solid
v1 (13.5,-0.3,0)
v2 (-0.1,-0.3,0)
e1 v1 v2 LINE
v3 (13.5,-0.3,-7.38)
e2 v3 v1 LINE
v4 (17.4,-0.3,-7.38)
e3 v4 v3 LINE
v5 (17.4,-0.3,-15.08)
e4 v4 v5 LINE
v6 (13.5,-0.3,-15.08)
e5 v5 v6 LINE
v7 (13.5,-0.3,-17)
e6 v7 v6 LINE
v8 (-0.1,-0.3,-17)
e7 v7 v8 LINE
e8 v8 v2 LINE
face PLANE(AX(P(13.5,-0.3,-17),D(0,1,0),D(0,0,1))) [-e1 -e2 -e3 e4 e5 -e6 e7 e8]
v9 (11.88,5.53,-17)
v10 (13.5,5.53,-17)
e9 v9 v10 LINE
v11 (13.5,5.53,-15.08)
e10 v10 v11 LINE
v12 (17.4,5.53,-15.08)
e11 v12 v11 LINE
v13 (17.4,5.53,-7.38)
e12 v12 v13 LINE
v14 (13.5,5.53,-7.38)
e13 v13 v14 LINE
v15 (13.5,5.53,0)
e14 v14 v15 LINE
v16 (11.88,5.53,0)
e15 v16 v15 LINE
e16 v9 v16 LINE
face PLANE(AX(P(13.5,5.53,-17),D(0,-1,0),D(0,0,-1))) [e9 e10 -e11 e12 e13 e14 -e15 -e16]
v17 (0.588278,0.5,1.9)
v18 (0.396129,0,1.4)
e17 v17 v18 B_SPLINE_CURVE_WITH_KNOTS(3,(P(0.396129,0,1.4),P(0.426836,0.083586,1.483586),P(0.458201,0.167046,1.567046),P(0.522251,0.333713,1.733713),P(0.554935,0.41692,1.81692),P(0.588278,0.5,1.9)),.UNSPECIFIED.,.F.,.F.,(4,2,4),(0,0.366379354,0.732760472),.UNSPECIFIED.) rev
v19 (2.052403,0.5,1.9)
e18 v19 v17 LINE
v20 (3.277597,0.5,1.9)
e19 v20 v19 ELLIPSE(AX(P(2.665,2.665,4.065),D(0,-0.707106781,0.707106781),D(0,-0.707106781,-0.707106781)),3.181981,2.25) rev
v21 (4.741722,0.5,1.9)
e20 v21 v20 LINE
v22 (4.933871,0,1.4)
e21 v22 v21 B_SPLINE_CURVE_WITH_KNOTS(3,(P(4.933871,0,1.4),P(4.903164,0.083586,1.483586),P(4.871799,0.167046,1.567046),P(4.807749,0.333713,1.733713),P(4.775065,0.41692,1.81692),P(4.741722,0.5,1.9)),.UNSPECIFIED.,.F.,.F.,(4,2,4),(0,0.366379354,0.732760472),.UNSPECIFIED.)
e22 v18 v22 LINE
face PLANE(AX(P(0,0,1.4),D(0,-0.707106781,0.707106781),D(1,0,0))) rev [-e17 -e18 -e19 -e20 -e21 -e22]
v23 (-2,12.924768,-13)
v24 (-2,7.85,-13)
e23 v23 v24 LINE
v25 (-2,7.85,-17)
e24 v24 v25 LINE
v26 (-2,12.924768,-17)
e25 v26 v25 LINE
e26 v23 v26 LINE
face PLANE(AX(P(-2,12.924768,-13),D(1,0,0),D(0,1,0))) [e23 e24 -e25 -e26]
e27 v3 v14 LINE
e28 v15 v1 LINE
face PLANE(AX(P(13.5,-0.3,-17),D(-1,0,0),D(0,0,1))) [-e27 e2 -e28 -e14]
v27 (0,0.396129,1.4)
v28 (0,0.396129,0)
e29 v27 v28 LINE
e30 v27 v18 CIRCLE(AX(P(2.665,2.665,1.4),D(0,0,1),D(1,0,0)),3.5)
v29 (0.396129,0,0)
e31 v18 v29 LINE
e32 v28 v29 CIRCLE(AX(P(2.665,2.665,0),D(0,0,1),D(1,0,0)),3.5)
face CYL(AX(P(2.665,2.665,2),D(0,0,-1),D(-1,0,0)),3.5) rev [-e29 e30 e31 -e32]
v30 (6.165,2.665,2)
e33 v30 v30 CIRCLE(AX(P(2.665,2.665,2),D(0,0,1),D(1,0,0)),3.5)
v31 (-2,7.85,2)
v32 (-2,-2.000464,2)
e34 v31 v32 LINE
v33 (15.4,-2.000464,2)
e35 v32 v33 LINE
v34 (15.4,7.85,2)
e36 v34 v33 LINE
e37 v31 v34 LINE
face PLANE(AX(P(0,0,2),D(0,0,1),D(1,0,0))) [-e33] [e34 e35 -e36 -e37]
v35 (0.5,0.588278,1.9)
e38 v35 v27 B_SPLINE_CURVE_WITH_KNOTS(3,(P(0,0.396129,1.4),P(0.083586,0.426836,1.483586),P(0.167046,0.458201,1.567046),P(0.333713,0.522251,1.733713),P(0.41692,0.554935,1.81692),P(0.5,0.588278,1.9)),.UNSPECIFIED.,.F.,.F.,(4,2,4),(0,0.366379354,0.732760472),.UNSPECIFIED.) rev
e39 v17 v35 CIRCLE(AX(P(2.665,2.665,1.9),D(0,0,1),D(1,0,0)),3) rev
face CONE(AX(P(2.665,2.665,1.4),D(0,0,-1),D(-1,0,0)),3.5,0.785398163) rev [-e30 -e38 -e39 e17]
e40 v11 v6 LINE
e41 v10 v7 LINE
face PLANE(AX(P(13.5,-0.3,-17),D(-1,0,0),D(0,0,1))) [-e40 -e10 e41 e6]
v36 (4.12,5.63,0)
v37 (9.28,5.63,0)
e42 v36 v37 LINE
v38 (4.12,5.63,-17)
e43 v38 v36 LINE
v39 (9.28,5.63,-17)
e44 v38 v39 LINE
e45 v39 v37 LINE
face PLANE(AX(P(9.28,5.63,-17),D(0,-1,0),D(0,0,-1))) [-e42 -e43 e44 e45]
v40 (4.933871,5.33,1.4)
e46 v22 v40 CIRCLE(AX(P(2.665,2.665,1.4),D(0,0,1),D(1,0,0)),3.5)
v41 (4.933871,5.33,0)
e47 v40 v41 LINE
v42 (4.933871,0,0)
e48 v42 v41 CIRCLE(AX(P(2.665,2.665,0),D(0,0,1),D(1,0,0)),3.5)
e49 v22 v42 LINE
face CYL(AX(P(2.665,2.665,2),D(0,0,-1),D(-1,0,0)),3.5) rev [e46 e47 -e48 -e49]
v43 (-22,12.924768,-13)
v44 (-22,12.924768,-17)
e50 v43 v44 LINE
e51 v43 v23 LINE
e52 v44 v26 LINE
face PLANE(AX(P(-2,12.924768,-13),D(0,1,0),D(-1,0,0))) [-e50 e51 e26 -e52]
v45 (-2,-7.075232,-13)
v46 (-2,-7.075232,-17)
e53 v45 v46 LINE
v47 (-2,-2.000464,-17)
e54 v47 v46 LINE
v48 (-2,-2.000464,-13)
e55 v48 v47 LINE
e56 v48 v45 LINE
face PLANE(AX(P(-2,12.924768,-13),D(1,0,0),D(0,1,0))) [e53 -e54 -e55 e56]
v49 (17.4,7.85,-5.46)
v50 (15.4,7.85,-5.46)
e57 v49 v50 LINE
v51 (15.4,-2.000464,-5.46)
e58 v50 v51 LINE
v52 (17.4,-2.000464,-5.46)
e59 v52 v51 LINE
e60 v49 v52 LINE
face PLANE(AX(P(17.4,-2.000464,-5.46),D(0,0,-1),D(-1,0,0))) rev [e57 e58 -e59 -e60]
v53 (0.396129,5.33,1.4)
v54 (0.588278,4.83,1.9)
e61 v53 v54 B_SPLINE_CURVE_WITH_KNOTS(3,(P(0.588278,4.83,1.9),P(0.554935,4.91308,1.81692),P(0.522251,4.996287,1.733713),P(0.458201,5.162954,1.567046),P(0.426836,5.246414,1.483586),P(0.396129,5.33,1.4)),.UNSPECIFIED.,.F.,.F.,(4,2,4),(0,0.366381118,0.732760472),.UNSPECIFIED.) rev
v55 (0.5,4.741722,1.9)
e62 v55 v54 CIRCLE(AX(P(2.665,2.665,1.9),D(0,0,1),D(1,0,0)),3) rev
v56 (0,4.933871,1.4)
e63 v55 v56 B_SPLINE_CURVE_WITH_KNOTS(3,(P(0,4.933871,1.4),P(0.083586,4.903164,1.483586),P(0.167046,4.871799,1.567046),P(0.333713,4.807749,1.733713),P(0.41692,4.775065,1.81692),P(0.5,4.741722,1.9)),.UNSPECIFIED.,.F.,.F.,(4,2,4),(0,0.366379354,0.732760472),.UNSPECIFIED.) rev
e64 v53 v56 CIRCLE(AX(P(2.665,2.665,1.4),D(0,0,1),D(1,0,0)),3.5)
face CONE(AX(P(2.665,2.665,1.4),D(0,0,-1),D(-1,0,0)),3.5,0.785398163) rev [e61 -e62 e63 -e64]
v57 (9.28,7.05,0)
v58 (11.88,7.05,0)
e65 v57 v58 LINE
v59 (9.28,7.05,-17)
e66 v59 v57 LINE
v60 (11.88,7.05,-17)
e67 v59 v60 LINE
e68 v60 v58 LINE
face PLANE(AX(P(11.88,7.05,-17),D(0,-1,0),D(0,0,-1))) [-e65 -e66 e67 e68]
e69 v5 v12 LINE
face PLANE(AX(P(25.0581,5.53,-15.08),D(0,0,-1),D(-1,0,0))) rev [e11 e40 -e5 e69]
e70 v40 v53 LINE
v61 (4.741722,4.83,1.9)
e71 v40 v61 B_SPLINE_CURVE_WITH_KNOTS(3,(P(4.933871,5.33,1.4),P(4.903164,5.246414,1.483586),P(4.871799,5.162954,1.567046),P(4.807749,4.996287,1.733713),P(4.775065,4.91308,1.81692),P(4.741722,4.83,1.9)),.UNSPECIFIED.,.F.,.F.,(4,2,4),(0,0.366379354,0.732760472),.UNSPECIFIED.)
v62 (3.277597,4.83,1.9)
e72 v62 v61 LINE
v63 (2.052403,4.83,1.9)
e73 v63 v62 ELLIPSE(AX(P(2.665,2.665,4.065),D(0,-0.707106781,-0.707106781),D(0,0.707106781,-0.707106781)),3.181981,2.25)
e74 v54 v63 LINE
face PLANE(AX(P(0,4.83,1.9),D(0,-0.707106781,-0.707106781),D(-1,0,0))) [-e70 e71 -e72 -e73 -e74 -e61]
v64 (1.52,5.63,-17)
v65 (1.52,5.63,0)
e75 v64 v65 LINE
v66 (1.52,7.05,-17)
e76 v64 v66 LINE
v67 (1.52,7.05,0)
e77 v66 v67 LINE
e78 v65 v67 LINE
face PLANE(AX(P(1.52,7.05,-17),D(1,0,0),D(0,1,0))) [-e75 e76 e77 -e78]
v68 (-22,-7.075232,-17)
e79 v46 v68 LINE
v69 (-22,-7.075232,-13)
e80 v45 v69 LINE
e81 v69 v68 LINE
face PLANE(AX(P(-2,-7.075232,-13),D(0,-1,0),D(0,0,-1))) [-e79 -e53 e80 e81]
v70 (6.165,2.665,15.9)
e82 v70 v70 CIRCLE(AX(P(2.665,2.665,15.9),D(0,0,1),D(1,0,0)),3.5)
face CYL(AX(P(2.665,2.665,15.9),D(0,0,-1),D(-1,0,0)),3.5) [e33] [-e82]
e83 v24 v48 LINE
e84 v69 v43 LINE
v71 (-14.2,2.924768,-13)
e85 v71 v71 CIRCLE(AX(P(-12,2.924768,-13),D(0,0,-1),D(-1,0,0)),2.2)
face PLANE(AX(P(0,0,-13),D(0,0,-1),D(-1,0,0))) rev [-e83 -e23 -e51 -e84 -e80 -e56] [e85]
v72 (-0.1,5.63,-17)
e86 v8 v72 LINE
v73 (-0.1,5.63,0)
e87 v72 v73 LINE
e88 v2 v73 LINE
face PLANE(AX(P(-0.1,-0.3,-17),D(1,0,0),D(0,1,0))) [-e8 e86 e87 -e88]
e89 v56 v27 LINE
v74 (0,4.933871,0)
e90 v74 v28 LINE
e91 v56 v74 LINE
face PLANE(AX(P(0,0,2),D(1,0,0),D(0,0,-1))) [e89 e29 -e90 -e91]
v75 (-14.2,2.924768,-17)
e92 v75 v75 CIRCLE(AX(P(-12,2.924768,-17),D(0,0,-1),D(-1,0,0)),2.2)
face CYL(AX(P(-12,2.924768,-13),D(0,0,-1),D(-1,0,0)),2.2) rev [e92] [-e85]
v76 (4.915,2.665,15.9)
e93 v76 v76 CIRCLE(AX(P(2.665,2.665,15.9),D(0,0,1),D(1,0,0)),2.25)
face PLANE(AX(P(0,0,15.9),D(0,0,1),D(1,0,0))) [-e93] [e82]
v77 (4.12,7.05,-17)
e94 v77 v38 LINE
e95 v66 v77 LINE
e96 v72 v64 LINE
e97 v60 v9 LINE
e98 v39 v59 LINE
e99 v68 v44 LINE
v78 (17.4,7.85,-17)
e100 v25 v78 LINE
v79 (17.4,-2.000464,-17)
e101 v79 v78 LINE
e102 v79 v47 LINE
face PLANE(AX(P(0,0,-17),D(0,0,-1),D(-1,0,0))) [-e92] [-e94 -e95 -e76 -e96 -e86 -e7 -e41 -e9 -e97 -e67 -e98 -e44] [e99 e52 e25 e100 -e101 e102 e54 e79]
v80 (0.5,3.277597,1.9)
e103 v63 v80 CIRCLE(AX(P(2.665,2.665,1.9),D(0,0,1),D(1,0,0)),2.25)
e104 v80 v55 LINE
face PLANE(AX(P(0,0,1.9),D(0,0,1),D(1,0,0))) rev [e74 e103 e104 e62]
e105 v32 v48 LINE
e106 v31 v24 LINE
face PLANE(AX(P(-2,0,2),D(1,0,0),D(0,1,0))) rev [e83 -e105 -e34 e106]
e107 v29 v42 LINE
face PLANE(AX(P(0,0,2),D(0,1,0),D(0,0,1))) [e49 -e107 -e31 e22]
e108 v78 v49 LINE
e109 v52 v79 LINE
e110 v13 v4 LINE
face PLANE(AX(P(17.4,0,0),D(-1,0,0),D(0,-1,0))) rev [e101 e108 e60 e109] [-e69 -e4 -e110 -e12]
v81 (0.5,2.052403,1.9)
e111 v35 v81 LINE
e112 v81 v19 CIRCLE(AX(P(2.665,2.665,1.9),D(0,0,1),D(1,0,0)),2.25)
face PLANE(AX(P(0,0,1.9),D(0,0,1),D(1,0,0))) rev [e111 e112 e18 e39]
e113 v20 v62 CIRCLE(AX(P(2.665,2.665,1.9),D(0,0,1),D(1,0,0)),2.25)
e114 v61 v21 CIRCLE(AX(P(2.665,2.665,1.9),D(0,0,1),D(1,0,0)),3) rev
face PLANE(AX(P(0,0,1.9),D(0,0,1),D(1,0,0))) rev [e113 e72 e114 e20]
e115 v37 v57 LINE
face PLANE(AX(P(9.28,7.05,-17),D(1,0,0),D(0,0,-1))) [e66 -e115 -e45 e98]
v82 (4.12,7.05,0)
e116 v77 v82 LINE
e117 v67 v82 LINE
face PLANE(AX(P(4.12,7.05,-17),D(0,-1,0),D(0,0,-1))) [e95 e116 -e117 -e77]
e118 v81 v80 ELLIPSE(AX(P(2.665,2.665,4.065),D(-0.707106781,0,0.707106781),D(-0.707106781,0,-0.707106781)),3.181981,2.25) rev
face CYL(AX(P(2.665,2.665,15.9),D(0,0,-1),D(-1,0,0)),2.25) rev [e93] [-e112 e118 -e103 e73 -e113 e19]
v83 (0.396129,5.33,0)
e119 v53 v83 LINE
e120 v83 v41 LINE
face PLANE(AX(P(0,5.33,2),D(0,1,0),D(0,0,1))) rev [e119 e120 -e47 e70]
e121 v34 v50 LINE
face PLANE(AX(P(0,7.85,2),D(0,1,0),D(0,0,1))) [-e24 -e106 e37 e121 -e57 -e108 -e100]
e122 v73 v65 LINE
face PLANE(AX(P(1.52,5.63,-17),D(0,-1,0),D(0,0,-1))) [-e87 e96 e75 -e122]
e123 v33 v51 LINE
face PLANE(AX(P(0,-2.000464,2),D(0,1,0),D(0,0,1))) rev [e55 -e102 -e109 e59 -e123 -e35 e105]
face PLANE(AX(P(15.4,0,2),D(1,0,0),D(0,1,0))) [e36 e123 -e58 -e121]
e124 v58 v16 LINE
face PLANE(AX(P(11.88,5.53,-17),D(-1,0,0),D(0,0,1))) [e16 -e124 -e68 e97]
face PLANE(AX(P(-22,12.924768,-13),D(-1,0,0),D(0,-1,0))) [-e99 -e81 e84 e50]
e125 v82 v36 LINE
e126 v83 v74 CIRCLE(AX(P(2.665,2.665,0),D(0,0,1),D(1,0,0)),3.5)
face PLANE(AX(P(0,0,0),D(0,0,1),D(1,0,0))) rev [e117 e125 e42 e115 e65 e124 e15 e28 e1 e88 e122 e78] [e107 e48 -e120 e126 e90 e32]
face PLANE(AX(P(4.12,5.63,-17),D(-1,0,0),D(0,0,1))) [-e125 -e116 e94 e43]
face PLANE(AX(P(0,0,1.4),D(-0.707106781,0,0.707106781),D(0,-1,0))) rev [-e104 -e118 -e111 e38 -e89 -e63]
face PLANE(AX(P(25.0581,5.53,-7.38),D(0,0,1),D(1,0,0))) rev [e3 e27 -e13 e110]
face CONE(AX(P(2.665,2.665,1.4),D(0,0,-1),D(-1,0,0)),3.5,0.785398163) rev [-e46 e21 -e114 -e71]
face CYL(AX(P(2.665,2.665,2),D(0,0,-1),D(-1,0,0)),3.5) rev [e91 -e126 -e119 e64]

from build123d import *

# Parameters (mm, degrees)
SKETCH1_W           = 17.4
SKETCH1_H           = 9.850463562
BOSS_EXTRUDE1_DEPTH = 2
BOSS_EXTRUDE2_START = 1.9
SKETCH1_4_R         = 2.25
BOSS_EXTRUDE2_DEPTH = 14
SKETCH2_W           = 17.4
SKETCH2_H           = 9.850463562
BOSS_EXTRUDE3_DEPTH = 17
SKETCH4_W           = 7.7
SKETCH4_H           = 5.83
CUT_EXTRUDE1_DEPTH  = 1.9
SKETCH5_W           = 20
SKETCH5_H           = 20
SKETCH5_R           = 2.2
BOSS_EXTRUDE4_DEPTH = 4
CHAMFER1_SIZE       = 0.5
SKETCH6_W           = 11.54
SKETCH6_H           = 9.850463562
SKETCH6_W_2         = 7.7
SKETCH6_H_2         = 5.83
BOSS_EXTRUDE5_DEPTH = 2


with BuildPart() as part:
    # Sketch1 → Boss-Extrude1 (new body)
    with BuildSketch(Plane.XY):
        with Locations((6.7, 2.924768219)):
            Rectangle(SKETCH1_W, SKETCH1_H)
        with BuildLine():
            Line((0, 0.396129135), (0, 4.933870865))
            ThreePointArc((0, 4.933870865), (0.190126266, 5.139873734), (0.396129135, 5.33))
            Line((0.396129135, 5.33), (4.933870865, 5.33))
            ThreePointArc((4.933870865, 5.33), (6.165, 2.665), (4.933870865, 0))
            Line((4.933870865, 0), (0.396129135, 0))
            ThreePointArc((0.396129135, 0), (0.190126266, 0.190126266), (0, 0.396129135))
        make_face(mode=Mode.SUBTRACT)
    extrude(amount=BOSS_EXTRUDE1_DEPTH)

    # Sketch1<4> → Boss-Extrude2 (add)
    # profile 1 of 4: a face of its own
    with BuildSketch(Plane.XY.offset(BOSS_EXTRUDE2_START)):
        with BuildLine():
            ThreePointArc((0.396129135, 5.33), (0.190126266, 5.139873734), (0, 4.933870865))
            Line((0, 4.933870865), (0, 0.396129135))
            ThreePointArc((0, 0.396129135), (0.190126266, 0.190126266), (0.396129135, 0))
            Line((0.396129135, 0), (4.933870865, 0))
            ThreePointArc((4.933870865, 0), (5.842345435, 1.197186665), (6.165, 2.665))
            ThreePointArc((6.165, 2.665), (5.842345435, 4.132813335), (4.933870865, 5.33))
            Line((4.933870865, 5.33), (0.396129135, 5.33))
        make_face()
        with Locations((2.665, 2.665)):
            Circle(SKETCH1_4_R, mode=Mode.SUBTRACT)
    # profile 2 of 4: a face of its own
    with BuildSketch(Plane.XY.offset(BOSS_EXTRUDE2_START)):
        with BuildLine():
            Line((0, 0.396129135), (0, 4.933870865))
            ThreePointArc((0, 4.933870865), (-0.835, 2.665), (0, 0.396129135))
        make_face()
    # profile 3 of 4: a face of its own
    with BuildSketch(Plane.XY.offset(BOSS_EXTRUDE2_START)):
        with BuildLine():
            ThreePointArc((4.933870865, 5.33), (2.665, 6.165), (0.396129135, 5.33))
            Line((0.396129135, 5.33), (4.933870865, 5.33))
        make_face()
    # profile 4 of 4: a face of its own
    with BuildSketch(Plane.XY.offset(BOSS_EXTRUDE2_START)):
        with BuildLine():
            Line((4.933870865, 0), (0.396129135, 0))
            ThreePointArc((0.396129135, 0), (2.665, -0.835), (4.933870865, 0))
        make_face()
    extrude(amount=BOSS_EXTRUDE2_DEPTH)

    # Sketch2 → Boss-Extrude3 (add)
    with BuildSketch(Plane(origin=(0, 0, 0), x_dir=(-1, 0, 0), z_dir=(0, 0, -1))):
        with Locations((-6.7, 2.924768219)):
            Rectangle(SKETCH2_W, SKETCH2_H)
        Polygon((-13.5, 5.53), (-11.88, 5.53), (-11.88, 7.05), (-9.28, 7.05), (-9.28, 5.63), (-4.12, 5.63), (-4.12, 7.05), (-1.52, 7.05), (-1.52, 5.63), (0.1, 5.63), (0.1, -0.3), (-13.5, -0.3), align=None, mode=Mode.SUBTRACT)
    extrude(amount=BOSS_EXTRUDE3_DEPTH)

    # Sketch4 → Cut-Extrude1 (cut)
    with BuildSketch(Plane.ZY.offset(-13.5)):
        with Locations((-11.23, 2.615)):
            Rectangle(SKETCH4_W, SKETCH4_H)
    extrude(amount=-CUT_EXTRUDE1_DEPTH, mode=Mode.SUBTRACT)

    # Sketch5 → Boss-Extrude4 (add)
    with BuildSketch(Plane(origin=(0, 0, -17), x_dir=(-1, 0, 0), z_dir=(0, 0, -1))):
        with Locations((12, 2.924768219)):
            Rectangle(SKETCH5_W, SKETCH5_H)
        with Locations((12, 2.924768219)):
            Circle(SKETCH5_R, mode=Mode.SUBTRACT)
    extrude(amount=-BOSS_EXTRUDE4_DEPTH)

    # Chamfer1
    # the kernel refuses this chamfer: 0.5 mm, written as the material it adds along each edge
    with BuildSketch(Plane(origin=(0, -0.889712359, 1.9), x_dir=(-0.027495876610586365, 0, -0.9996219169112968), z_dir=(0, 1, 0))) as chamfer1_piece_1_section:
        Polygon((CHAMFER1_SIZE * 0.999621916911, -CHAMFER1_SIZE * 0.0274958766106), (-CHAMFER1_SIZE * 0.0274958766106, -CHAMFER1_SIZE * 0.999621916911), (0, 0), align=None)
    chamfer1_piece_1 = extrude(amount=7.109424717, mode=Mode.PRIVATE)
    chamfer1_piece_1 = chamfer1_piece_1 - Plane(origin=(2.665, 2.665, 1.727474794), x_dir=(1, 0, 0), z_dir=(0, 0, -1)) * Cylinder(2.25, 17, mode=Mode.PRIVATE)
    add(chamfer1_piece_1)
    with BuildSketch(Plane(origin=(-0.889712359, 5.33, 1.9), x_dir=(0, 0.027495876610585623, -0.9996219169112968), z_dir=(1, 0, 0))) as chamfer1_piece_2_section:
        Polygon((CHAMFER1_SIZE * 0.999621916911, -CHAMFER1_SIZE * 0.0274958766106), (-CHAMFER1_SIZE * 0.0274958766106, -CHAMFER1_SIZE * 0.999621916911), (0, 0), align=None)
    chamfer1_piece_2 = extrude(amount=7.109424717, mode=Mode.PRIVATE)
    chamfer1_piece_2 = chamfer1_piece_2 - Plane(origin=(2.665, 2.665, 1.727474794), x_dir=(1, 0, 0), z_dir=(0, 0, -1)) * Cylinder(2.25, 17, mode=Mode.PRIVATE)
    add(chamfer1_piece_2)
    with BuildSketch(Plane(origin=(6.219712359, 0, 1.9), x_dir=(0, -0.027495876610586365, -0.9996219169112968), z_dir=(-1, 0, 0))) as chamfer1_piece_3_section:
        Polygon((CHAMFER1_SIZE * 0.999621916911, -CHAMFER1_SIZE * 0.0274958766106), (-CHAMFER1_SIZE * 0.0274958766106, -CHAMFER1_SIZE * 0.999621916911), (0, 0), align=None)
    chamfer1_piece_3 = extrude(amount=7.109424717, mode=Mode.PRIVATE)
    chamfer1_piece_3 = chamfer1_piece_3 - Plane(origin=(2.665, 2.665, 1.727474794), x_dir=(1, 0, 0), z_dir=(0, 0, -1)) * Cylinder(2.25, 17, mode=Mode.PRIVATE)
    add(chamfer1_piece_3)
    with BuildSketch(Plane(origin=(2.665, 2.665, 1.9), x_dir=(-0.9434537391287974, -0.3315042113215022, 0), z_dir=(-0.3315042113215022, 0.9434537391287974, 0))) as chamfer1_piece_4:
        Polygon((3.5, -CHAMFER1_SIZE), (3.5 - CHAMFER1_SIZE, 0), (3.5, 0), align=None)
    revolve(axis=Axis((2.665, 2.665, 1.9), (0, 0, 1)), revolution_arc=51.27979911)
    with BuildSketch(Plane(origin=(2.665, 2.665, 1.9), x_dir=(0.33133655383280003, -0.943512632715749, 0), z_dir=(-0.943512632715749, -0.33133655383280003, 0))) as chamfer1_piece_5:
        Polygon((3.5, -CHAMFER1_SIZE), (3.5 - CHAMFER1_SIZE, 0), (3.5, 0), align=None)
    revolve(axis=Axis((2.665, 2.665, 1.9), (0, 0, 1)), revolution_arc=141.300162094)
    with BuildSketch(Plane(origin=(2.665, 2.665, 1.9), x_dir=(-0.33150421132149205, 0.9434537391288009, 0), z_dir=(0.9434537391288009, 0.33150421132149205, 0))) as chamfer1_piece_6:
        Polygon((3.5, -CHAMFER1_SIZE), (3.5 - CHAMFER1_SIZE, 0), (3.5, 0), align=None)
    revolve(axis=Axis((2.665, 2.665, 1.9), (0, 0, 1)), revolution_arc=51.27979911)

    # Sketch6 → Boss-Extrude5 (add)
    with BuildSketch(Plane(origin=(15.4, 0, 0), x_dir=(0, 0, -1), z_dir=(1, 0, 0))):
        with Locations((11.23, 2.924768219)):
            Rectangle(SKETCH6_W, SKETCH6_H)
        with Locations((11.23, 2.615)):
            Rectangle(SKETCH6_W_2, SKETCH6_H_2, mode=Mode.SUBTRACT)
    extrude(amount=BOSS_EXTRUDE5_DEPTH)


solid = part.part
